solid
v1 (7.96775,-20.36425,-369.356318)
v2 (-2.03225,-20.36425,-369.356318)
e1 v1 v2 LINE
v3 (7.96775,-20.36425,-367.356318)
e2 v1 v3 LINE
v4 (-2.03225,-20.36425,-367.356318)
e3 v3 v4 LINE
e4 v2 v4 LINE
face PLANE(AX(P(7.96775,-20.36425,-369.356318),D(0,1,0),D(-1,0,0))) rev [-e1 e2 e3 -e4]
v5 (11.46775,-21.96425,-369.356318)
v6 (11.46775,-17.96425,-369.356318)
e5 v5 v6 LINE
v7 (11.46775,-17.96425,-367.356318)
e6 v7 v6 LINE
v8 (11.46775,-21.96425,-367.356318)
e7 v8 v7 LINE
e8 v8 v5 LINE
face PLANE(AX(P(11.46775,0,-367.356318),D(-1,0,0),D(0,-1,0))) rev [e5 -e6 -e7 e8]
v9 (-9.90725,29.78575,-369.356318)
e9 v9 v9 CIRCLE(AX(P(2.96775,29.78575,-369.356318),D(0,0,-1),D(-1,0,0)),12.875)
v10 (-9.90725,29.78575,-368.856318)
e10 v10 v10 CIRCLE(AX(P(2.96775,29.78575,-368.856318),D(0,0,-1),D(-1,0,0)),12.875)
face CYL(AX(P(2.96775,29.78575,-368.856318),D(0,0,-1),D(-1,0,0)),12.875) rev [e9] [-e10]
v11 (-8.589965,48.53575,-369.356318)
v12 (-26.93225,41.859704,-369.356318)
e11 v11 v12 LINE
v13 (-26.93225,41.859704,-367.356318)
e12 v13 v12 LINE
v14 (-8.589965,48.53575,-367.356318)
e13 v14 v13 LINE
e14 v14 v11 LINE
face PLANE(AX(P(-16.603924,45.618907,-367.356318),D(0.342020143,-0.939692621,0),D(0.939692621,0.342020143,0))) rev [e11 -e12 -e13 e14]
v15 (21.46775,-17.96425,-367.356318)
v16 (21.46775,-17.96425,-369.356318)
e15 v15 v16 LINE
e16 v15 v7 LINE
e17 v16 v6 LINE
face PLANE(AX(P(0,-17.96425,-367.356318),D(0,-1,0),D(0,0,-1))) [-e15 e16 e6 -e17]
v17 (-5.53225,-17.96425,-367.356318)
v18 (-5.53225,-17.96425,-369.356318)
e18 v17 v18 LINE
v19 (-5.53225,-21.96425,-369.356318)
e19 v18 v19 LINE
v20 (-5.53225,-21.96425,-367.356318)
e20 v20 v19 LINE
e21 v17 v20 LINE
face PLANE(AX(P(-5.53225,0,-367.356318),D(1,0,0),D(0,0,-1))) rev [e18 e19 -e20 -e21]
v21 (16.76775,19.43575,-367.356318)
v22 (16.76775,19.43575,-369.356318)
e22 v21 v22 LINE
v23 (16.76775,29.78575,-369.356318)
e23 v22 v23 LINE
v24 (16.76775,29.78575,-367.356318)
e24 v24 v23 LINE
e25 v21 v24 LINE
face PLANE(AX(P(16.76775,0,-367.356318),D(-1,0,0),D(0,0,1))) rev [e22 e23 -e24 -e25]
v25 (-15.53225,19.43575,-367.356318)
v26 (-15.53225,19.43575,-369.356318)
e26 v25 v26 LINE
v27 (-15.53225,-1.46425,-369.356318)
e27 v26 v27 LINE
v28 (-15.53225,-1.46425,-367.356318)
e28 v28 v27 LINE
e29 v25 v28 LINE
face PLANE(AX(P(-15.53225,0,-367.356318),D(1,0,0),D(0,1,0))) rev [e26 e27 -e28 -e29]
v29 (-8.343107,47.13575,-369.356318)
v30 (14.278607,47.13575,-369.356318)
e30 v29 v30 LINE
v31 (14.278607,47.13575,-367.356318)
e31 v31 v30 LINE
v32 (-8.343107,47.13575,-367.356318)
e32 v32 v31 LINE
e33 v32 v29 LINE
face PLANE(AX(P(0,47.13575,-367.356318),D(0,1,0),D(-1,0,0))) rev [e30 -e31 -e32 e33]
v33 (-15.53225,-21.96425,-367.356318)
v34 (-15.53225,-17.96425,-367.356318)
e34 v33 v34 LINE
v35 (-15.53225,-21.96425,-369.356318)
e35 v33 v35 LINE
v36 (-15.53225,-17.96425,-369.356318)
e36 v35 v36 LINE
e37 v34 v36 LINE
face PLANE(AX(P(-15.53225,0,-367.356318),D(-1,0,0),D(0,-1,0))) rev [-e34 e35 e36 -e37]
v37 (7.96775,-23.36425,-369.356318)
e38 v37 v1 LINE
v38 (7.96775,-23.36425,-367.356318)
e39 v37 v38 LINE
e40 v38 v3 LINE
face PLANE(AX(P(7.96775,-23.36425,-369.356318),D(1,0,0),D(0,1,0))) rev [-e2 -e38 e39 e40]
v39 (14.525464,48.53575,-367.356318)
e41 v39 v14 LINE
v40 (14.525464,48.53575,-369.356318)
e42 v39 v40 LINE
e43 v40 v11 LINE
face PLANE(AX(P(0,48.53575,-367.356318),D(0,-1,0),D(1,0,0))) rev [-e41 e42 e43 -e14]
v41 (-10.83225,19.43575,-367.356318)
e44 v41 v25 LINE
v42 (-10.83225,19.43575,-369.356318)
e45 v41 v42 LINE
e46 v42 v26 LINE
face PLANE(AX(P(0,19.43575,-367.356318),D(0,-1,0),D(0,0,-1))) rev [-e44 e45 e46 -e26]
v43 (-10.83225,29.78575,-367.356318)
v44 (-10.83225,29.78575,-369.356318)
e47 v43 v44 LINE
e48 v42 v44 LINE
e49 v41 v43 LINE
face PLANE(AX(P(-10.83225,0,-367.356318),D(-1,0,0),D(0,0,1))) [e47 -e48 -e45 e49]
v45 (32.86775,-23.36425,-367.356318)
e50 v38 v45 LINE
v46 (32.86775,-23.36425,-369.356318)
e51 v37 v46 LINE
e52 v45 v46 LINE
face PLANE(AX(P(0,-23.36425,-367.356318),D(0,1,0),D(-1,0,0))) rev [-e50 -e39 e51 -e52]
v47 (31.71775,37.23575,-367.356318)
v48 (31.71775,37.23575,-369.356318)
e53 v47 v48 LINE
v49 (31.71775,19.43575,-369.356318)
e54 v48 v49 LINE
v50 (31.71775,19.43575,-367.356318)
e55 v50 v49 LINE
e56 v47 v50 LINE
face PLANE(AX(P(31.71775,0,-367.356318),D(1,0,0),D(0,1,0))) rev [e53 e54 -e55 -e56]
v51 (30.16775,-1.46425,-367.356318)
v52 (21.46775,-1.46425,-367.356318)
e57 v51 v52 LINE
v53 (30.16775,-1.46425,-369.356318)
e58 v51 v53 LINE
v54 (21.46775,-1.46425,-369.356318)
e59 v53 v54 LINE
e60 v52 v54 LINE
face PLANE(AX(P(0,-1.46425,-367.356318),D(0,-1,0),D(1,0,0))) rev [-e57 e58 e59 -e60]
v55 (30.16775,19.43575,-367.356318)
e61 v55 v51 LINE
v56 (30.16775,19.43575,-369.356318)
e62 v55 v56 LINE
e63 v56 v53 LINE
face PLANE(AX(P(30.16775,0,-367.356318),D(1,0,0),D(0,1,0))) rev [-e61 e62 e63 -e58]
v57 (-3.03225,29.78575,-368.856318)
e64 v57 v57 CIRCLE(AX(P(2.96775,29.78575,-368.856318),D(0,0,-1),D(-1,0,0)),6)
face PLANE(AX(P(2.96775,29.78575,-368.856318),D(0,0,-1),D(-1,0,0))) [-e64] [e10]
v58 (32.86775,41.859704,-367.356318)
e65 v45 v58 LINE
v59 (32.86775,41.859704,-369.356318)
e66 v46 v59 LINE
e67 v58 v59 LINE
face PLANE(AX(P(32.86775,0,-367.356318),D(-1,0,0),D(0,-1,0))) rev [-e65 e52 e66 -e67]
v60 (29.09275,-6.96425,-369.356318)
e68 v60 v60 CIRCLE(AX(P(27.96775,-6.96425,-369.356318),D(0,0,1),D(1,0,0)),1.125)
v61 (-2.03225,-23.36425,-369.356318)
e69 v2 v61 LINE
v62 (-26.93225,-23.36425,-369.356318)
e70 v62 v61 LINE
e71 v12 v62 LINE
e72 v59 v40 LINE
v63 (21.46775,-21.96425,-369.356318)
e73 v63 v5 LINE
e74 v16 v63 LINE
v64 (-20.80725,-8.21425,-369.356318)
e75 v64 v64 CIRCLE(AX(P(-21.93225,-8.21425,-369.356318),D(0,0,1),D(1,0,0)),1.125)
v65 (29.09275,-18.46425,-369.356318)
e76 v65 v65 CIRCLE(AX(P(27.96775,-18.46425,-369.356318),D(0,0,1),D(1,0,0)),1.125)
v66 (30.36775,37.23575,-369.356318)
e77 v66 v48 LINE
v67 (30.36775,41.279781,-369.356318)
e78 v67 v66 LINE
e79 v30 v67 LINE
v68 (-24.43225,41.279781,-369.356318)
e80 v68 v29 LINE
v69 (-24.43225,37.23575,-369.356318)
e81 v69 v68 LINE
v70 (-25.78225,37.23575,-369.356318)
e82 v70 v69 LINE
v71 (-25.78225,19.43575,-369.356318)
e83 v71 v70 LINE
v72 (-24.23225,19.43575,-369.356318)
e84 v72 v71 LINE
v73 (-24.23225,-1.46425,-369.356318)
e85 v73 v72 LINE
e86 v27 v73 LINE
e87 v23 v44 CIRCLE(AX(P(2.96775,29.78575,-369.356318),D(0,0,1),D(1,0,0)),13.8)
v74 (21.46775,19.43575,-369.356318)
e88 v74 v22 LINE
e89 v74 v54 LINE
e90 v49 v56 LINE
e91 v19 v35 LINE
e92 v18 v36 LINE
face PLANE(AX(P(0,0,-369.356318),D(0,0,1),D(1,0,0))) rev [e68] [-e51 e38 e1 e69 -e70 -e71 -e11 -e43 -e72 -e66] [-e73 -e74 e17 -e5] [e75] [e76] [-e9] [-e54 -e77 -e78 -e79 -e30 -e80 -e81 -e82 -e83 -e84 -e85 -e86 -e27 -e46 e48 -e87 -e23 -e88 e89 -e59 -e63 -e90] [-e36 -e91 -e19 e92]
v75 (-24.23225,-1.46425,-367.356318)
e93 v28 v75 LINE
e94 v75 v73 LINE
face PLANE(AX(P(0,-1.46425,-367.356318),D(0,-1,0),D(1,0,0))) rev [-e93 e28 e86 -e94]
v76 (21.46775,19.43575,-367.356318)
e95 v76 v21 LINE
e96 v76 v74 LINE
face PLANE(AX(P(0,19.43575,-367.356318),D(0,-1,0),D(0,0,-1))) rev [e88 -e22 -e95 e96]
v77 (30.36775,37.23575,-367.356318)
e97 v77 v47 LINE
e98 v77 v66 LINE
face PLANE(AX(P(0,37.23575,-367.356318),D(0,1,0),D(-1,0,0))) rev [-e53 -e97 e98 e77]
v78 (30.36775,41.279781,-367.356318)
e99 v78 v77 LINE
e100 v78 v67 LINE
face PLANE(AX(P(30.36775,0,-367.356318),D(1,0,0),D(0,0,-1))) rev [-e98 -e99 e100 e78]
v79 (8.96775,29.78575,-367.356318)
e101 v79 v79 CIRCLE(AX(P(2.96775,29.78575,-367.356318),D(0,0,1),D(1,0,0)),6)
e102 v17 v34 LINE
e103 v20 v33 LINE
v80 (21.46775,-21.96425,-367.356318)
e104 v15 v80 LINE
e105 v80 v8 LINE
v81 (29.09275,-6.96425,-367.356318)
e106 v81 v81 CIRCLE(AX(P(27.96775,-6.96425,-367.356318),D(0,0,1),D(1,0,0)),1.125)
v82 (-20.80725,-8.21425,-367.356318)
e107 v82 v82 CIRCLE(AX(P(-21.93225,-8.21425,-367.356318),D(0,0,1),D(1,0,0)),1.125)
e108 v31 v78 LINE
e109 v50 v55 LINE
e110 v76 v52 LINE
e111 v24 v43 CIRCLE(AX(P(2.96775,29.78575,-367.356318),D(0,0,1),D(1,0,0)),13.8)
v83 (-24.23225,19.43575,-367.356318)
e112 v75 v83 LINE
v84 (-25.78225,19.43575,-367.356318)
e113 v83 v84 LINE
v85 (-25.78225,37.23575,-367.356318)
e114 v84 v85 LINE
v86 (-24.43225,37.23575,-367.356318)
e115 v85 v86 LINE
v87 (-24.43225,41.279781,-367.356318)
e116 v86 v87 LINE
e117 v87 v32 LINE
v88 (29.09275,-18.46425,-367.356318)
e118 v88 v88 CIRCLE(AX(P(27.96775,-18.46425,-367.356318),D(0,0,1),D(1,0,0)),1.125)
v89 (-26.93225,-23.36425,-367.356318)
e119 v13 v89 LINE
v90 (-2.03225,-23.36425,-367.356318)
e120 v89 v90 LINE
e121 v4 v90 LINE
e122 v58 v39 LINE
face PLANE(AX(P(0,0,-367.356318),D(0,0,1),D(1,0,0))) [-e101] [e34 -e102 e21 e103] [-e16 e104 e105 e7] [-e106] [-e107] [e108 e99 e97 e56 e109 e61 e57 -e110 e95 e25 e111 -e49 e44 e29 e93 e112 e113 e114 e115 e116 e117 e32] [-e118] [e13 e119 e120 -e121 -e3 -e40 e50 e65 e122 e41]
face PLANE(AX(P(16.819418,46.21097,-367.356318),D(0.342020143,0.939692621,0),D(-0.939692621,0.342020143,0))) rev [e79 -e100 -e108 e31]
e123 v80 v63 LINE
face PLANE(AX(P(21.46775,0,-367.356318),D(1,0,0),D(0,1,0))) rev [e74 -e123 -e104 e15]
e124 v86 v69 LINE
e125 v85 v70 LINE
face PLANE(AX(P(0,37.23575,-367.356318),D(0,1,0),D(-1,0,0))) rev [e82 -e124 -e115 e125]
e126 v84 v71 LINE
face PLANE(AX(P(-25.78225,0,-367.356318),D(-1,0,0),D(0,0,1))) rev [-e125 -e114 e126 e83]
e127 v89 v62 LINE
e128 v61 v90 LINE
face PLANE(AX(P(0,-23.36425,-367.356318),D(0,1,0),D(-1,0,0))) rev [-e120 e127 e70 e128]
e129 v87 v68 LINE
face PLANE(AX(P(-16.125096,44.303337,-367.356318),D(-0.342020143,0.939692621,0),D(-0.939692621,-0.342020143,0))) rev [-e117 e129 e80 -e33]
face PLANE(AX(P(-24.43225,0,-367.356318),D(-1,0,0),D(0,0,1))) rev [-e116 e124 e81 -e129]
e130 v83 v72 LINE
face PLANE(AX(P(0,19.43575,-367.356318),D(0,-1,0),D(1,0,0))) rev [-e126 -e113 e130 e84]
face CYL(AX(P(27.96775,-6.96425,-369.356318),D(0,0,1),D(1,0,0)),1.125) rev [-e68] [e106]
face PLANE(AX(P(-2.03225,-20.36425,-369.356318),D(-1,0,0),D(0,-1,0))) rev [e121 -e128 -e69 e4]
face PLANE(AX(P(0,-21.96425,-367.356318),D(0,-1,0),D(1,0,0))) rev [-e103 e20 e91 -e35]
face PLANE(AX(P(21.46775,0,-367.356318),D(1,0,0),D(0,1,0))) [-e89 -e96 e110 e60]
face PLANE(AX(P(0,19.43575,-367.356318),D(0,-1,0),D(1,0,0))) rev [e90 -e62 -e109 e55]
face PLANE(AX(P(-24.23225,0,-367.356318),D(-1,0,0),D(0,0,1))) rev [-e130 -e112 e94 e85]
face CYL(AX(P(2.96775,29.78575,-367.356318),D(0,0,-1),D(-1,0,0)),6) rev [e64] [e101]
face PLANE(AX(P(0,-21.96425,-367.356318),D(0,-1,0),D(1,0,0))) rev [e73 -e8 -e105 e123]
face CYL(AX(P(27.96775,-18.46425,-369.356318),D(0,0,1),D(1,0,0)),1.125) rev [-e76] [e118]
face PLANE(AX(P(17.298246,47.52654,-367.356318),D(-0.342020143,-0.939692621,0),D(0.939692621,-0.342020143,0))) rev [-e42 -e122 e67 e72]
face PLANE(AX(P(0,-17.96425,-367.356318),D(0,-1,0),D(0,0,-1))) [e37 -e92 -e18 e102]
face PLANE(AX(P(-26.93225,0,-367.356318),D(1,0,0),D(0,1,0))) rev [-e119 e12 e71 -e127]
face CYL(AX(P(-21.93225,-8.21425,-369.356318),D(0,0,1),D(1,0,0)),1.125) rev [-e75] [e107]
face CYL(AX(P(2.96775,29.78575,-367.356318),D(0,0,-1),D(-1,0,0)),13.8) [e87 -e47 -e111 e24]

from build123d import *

# Parameters (mm, degrees)
SKETCH1_W           = 10
SKETCH1_H           = 4
SKETCH1_R           = 6
BOSS_EXTRUDE1_DEPTH = 2
SKETCH2_R           = 12.875
CUT_EXTRUDE1_DEPTH  = 0.5
SKETCH3_R           = 1.125
CUT_EXTRUDE2_DEPTH  = 59.651581376
SKETCH4_W           = 10
SKETCH4_H           = 3
CUT_EXTRUDE3_DEPTH  = 59.651581376


with BuildPart() as part:
    # Sketch1 → Boss-Extrude1 (new body)
    with BuildSketch(Plane.XY.offset(-369.35631811)):
        Polygon((32.867749828, 41.859703988), (14.52546441, 48.535749909), (-8.589964754, 48.535749909), (-26.932250172, 41.859703988), (-26.932250172, -23.364250091), (32.867749828, -23.364250091), align=None)
        with BuildLine():
            Line((-24.432250172, 37.235749909), (-24.432250172, 41.279780692))
            Line((-24.432250172, 41.279780692), (-8.343106981, 47.135749909))
            Line((-8.343106981, 47.135749909), (14.278606637, 47.135749909))
            Line((14.278606637, 47.135749909), (30.367749828, 41.279780692))
            Line((30.367749828, 41.279780692), (30.367749828, 37.235749909))
            Line((30.367749828, 37.235749909), (31.717749828, 37.235749909))
            Line((31.717749828, 37.235749909), (31.717749828, 19.435749909))
            Line((31.717749828, 19.435749909), (30.167749828, 19.435749909))
            Line((30.167749828, 19.435749909), (30.167749828, -1.464250091))
            Line((30.167749828, -1.464250091), (21.467749828, -1.464250091))
            Line((21.467749828, -1.464250091), (21.467749828, 19.435749909))
            Line((21.467749828, 19.435749909), (16.767749828, 19.435749909))
            Line((16.767749828, 19.435749909), (16.767749828, 29.785749909))
            ThreePointArc((16.767749828, 29.785749909), (2.967749828, 43.585749909), (-10.832250172, 29.785749909))
            Line((-10.832250172, 29.785749909), (-10.832250172, 19.435749909))
            Line((-10.832250172, 19.435749909), (-15.532250172, 19.435749909))
            Line((-15.532250172, 19.435749909), (-15.532250172, -1.464250091))
            Line((-15.532250172, -1.464250091), (-24.232250172, -1.464250091))
            Line((-24.232250172, -1.464250091), (-24.232250172, 19.435749909))
            Line((-24.232250172, 19.435749909), (-25.782250172, 19.435749909))
            Line((-25.782250172, 19.435749909), (-25.782250172, 37.235749909))
            Line((-25.782250172, 37.235749909), (-24.432250172, 37.235749909))
        make_face(mode=Mode.SUBTRACT)
        with Locations((-10.532250172, -19.964250091)):
            Rectangle(SKETCH1_W, SKETCH1_H, mode=Mode.SUBTRACT)
        with Locations((16.467749828, -19.964250091)):
            Rectangle(SKETCH1_W, SKETCH1_H, mode=Mode.SUBTRACT)
        with Locations((2.967749828, 29.785749909)):
            Circle(SKETCH1_R, mode=Mode.SUBTRACT)
    extrude(amount=BOSS_EXTRUDE1_DEPTH)

    # Sketch2 → Cut-Extrude1 (cut)
    with BuildSketch(Plane(origin=(0, 0, -369.35631811), x_dir=(-1, 0, 0), z_dir=(0, 0, -1))):
        with Locations((-2.967749828, 29.785749909)):
            Circle(SKETCH2_R)
    extrude(amount=-CUT_EXTRUDE1_DEPTH, mode=Mode.SUBTRACT)

    # Sketch3 → Cut-Extrude2 (cut, through all)
    with BuildSketch(Plane.XY.offset(-367.35631811)):
        with Locations((27.967749828, -6.964250091)):
            Circle(SKETCH3_R)
        with Locations((27.967749828, -18.464250091)):
            Circle(SKETCH3_R)
        with Locations((-21.932250172, -8.214250091)):
            Circle(SKETCH3_R)
    extrude(amount=-CUT_EXTRUDE2_DEPTH, mode=Mode.SUBTRACT)

    # Sketch4 → Cut-Extrude3 (cut, through all)
    with BuildSketch(Plane.XY.offset(-367.35631811)):
        with Locations((2.967749828, -21.864250091)):
            Rectangle(SKETCH4_W, SKETCH4_H)
    extrude(amount=-CUT_EXTRUDE3_DEPTH, mode=Mode.SUBTRACT)


solid = part.part
